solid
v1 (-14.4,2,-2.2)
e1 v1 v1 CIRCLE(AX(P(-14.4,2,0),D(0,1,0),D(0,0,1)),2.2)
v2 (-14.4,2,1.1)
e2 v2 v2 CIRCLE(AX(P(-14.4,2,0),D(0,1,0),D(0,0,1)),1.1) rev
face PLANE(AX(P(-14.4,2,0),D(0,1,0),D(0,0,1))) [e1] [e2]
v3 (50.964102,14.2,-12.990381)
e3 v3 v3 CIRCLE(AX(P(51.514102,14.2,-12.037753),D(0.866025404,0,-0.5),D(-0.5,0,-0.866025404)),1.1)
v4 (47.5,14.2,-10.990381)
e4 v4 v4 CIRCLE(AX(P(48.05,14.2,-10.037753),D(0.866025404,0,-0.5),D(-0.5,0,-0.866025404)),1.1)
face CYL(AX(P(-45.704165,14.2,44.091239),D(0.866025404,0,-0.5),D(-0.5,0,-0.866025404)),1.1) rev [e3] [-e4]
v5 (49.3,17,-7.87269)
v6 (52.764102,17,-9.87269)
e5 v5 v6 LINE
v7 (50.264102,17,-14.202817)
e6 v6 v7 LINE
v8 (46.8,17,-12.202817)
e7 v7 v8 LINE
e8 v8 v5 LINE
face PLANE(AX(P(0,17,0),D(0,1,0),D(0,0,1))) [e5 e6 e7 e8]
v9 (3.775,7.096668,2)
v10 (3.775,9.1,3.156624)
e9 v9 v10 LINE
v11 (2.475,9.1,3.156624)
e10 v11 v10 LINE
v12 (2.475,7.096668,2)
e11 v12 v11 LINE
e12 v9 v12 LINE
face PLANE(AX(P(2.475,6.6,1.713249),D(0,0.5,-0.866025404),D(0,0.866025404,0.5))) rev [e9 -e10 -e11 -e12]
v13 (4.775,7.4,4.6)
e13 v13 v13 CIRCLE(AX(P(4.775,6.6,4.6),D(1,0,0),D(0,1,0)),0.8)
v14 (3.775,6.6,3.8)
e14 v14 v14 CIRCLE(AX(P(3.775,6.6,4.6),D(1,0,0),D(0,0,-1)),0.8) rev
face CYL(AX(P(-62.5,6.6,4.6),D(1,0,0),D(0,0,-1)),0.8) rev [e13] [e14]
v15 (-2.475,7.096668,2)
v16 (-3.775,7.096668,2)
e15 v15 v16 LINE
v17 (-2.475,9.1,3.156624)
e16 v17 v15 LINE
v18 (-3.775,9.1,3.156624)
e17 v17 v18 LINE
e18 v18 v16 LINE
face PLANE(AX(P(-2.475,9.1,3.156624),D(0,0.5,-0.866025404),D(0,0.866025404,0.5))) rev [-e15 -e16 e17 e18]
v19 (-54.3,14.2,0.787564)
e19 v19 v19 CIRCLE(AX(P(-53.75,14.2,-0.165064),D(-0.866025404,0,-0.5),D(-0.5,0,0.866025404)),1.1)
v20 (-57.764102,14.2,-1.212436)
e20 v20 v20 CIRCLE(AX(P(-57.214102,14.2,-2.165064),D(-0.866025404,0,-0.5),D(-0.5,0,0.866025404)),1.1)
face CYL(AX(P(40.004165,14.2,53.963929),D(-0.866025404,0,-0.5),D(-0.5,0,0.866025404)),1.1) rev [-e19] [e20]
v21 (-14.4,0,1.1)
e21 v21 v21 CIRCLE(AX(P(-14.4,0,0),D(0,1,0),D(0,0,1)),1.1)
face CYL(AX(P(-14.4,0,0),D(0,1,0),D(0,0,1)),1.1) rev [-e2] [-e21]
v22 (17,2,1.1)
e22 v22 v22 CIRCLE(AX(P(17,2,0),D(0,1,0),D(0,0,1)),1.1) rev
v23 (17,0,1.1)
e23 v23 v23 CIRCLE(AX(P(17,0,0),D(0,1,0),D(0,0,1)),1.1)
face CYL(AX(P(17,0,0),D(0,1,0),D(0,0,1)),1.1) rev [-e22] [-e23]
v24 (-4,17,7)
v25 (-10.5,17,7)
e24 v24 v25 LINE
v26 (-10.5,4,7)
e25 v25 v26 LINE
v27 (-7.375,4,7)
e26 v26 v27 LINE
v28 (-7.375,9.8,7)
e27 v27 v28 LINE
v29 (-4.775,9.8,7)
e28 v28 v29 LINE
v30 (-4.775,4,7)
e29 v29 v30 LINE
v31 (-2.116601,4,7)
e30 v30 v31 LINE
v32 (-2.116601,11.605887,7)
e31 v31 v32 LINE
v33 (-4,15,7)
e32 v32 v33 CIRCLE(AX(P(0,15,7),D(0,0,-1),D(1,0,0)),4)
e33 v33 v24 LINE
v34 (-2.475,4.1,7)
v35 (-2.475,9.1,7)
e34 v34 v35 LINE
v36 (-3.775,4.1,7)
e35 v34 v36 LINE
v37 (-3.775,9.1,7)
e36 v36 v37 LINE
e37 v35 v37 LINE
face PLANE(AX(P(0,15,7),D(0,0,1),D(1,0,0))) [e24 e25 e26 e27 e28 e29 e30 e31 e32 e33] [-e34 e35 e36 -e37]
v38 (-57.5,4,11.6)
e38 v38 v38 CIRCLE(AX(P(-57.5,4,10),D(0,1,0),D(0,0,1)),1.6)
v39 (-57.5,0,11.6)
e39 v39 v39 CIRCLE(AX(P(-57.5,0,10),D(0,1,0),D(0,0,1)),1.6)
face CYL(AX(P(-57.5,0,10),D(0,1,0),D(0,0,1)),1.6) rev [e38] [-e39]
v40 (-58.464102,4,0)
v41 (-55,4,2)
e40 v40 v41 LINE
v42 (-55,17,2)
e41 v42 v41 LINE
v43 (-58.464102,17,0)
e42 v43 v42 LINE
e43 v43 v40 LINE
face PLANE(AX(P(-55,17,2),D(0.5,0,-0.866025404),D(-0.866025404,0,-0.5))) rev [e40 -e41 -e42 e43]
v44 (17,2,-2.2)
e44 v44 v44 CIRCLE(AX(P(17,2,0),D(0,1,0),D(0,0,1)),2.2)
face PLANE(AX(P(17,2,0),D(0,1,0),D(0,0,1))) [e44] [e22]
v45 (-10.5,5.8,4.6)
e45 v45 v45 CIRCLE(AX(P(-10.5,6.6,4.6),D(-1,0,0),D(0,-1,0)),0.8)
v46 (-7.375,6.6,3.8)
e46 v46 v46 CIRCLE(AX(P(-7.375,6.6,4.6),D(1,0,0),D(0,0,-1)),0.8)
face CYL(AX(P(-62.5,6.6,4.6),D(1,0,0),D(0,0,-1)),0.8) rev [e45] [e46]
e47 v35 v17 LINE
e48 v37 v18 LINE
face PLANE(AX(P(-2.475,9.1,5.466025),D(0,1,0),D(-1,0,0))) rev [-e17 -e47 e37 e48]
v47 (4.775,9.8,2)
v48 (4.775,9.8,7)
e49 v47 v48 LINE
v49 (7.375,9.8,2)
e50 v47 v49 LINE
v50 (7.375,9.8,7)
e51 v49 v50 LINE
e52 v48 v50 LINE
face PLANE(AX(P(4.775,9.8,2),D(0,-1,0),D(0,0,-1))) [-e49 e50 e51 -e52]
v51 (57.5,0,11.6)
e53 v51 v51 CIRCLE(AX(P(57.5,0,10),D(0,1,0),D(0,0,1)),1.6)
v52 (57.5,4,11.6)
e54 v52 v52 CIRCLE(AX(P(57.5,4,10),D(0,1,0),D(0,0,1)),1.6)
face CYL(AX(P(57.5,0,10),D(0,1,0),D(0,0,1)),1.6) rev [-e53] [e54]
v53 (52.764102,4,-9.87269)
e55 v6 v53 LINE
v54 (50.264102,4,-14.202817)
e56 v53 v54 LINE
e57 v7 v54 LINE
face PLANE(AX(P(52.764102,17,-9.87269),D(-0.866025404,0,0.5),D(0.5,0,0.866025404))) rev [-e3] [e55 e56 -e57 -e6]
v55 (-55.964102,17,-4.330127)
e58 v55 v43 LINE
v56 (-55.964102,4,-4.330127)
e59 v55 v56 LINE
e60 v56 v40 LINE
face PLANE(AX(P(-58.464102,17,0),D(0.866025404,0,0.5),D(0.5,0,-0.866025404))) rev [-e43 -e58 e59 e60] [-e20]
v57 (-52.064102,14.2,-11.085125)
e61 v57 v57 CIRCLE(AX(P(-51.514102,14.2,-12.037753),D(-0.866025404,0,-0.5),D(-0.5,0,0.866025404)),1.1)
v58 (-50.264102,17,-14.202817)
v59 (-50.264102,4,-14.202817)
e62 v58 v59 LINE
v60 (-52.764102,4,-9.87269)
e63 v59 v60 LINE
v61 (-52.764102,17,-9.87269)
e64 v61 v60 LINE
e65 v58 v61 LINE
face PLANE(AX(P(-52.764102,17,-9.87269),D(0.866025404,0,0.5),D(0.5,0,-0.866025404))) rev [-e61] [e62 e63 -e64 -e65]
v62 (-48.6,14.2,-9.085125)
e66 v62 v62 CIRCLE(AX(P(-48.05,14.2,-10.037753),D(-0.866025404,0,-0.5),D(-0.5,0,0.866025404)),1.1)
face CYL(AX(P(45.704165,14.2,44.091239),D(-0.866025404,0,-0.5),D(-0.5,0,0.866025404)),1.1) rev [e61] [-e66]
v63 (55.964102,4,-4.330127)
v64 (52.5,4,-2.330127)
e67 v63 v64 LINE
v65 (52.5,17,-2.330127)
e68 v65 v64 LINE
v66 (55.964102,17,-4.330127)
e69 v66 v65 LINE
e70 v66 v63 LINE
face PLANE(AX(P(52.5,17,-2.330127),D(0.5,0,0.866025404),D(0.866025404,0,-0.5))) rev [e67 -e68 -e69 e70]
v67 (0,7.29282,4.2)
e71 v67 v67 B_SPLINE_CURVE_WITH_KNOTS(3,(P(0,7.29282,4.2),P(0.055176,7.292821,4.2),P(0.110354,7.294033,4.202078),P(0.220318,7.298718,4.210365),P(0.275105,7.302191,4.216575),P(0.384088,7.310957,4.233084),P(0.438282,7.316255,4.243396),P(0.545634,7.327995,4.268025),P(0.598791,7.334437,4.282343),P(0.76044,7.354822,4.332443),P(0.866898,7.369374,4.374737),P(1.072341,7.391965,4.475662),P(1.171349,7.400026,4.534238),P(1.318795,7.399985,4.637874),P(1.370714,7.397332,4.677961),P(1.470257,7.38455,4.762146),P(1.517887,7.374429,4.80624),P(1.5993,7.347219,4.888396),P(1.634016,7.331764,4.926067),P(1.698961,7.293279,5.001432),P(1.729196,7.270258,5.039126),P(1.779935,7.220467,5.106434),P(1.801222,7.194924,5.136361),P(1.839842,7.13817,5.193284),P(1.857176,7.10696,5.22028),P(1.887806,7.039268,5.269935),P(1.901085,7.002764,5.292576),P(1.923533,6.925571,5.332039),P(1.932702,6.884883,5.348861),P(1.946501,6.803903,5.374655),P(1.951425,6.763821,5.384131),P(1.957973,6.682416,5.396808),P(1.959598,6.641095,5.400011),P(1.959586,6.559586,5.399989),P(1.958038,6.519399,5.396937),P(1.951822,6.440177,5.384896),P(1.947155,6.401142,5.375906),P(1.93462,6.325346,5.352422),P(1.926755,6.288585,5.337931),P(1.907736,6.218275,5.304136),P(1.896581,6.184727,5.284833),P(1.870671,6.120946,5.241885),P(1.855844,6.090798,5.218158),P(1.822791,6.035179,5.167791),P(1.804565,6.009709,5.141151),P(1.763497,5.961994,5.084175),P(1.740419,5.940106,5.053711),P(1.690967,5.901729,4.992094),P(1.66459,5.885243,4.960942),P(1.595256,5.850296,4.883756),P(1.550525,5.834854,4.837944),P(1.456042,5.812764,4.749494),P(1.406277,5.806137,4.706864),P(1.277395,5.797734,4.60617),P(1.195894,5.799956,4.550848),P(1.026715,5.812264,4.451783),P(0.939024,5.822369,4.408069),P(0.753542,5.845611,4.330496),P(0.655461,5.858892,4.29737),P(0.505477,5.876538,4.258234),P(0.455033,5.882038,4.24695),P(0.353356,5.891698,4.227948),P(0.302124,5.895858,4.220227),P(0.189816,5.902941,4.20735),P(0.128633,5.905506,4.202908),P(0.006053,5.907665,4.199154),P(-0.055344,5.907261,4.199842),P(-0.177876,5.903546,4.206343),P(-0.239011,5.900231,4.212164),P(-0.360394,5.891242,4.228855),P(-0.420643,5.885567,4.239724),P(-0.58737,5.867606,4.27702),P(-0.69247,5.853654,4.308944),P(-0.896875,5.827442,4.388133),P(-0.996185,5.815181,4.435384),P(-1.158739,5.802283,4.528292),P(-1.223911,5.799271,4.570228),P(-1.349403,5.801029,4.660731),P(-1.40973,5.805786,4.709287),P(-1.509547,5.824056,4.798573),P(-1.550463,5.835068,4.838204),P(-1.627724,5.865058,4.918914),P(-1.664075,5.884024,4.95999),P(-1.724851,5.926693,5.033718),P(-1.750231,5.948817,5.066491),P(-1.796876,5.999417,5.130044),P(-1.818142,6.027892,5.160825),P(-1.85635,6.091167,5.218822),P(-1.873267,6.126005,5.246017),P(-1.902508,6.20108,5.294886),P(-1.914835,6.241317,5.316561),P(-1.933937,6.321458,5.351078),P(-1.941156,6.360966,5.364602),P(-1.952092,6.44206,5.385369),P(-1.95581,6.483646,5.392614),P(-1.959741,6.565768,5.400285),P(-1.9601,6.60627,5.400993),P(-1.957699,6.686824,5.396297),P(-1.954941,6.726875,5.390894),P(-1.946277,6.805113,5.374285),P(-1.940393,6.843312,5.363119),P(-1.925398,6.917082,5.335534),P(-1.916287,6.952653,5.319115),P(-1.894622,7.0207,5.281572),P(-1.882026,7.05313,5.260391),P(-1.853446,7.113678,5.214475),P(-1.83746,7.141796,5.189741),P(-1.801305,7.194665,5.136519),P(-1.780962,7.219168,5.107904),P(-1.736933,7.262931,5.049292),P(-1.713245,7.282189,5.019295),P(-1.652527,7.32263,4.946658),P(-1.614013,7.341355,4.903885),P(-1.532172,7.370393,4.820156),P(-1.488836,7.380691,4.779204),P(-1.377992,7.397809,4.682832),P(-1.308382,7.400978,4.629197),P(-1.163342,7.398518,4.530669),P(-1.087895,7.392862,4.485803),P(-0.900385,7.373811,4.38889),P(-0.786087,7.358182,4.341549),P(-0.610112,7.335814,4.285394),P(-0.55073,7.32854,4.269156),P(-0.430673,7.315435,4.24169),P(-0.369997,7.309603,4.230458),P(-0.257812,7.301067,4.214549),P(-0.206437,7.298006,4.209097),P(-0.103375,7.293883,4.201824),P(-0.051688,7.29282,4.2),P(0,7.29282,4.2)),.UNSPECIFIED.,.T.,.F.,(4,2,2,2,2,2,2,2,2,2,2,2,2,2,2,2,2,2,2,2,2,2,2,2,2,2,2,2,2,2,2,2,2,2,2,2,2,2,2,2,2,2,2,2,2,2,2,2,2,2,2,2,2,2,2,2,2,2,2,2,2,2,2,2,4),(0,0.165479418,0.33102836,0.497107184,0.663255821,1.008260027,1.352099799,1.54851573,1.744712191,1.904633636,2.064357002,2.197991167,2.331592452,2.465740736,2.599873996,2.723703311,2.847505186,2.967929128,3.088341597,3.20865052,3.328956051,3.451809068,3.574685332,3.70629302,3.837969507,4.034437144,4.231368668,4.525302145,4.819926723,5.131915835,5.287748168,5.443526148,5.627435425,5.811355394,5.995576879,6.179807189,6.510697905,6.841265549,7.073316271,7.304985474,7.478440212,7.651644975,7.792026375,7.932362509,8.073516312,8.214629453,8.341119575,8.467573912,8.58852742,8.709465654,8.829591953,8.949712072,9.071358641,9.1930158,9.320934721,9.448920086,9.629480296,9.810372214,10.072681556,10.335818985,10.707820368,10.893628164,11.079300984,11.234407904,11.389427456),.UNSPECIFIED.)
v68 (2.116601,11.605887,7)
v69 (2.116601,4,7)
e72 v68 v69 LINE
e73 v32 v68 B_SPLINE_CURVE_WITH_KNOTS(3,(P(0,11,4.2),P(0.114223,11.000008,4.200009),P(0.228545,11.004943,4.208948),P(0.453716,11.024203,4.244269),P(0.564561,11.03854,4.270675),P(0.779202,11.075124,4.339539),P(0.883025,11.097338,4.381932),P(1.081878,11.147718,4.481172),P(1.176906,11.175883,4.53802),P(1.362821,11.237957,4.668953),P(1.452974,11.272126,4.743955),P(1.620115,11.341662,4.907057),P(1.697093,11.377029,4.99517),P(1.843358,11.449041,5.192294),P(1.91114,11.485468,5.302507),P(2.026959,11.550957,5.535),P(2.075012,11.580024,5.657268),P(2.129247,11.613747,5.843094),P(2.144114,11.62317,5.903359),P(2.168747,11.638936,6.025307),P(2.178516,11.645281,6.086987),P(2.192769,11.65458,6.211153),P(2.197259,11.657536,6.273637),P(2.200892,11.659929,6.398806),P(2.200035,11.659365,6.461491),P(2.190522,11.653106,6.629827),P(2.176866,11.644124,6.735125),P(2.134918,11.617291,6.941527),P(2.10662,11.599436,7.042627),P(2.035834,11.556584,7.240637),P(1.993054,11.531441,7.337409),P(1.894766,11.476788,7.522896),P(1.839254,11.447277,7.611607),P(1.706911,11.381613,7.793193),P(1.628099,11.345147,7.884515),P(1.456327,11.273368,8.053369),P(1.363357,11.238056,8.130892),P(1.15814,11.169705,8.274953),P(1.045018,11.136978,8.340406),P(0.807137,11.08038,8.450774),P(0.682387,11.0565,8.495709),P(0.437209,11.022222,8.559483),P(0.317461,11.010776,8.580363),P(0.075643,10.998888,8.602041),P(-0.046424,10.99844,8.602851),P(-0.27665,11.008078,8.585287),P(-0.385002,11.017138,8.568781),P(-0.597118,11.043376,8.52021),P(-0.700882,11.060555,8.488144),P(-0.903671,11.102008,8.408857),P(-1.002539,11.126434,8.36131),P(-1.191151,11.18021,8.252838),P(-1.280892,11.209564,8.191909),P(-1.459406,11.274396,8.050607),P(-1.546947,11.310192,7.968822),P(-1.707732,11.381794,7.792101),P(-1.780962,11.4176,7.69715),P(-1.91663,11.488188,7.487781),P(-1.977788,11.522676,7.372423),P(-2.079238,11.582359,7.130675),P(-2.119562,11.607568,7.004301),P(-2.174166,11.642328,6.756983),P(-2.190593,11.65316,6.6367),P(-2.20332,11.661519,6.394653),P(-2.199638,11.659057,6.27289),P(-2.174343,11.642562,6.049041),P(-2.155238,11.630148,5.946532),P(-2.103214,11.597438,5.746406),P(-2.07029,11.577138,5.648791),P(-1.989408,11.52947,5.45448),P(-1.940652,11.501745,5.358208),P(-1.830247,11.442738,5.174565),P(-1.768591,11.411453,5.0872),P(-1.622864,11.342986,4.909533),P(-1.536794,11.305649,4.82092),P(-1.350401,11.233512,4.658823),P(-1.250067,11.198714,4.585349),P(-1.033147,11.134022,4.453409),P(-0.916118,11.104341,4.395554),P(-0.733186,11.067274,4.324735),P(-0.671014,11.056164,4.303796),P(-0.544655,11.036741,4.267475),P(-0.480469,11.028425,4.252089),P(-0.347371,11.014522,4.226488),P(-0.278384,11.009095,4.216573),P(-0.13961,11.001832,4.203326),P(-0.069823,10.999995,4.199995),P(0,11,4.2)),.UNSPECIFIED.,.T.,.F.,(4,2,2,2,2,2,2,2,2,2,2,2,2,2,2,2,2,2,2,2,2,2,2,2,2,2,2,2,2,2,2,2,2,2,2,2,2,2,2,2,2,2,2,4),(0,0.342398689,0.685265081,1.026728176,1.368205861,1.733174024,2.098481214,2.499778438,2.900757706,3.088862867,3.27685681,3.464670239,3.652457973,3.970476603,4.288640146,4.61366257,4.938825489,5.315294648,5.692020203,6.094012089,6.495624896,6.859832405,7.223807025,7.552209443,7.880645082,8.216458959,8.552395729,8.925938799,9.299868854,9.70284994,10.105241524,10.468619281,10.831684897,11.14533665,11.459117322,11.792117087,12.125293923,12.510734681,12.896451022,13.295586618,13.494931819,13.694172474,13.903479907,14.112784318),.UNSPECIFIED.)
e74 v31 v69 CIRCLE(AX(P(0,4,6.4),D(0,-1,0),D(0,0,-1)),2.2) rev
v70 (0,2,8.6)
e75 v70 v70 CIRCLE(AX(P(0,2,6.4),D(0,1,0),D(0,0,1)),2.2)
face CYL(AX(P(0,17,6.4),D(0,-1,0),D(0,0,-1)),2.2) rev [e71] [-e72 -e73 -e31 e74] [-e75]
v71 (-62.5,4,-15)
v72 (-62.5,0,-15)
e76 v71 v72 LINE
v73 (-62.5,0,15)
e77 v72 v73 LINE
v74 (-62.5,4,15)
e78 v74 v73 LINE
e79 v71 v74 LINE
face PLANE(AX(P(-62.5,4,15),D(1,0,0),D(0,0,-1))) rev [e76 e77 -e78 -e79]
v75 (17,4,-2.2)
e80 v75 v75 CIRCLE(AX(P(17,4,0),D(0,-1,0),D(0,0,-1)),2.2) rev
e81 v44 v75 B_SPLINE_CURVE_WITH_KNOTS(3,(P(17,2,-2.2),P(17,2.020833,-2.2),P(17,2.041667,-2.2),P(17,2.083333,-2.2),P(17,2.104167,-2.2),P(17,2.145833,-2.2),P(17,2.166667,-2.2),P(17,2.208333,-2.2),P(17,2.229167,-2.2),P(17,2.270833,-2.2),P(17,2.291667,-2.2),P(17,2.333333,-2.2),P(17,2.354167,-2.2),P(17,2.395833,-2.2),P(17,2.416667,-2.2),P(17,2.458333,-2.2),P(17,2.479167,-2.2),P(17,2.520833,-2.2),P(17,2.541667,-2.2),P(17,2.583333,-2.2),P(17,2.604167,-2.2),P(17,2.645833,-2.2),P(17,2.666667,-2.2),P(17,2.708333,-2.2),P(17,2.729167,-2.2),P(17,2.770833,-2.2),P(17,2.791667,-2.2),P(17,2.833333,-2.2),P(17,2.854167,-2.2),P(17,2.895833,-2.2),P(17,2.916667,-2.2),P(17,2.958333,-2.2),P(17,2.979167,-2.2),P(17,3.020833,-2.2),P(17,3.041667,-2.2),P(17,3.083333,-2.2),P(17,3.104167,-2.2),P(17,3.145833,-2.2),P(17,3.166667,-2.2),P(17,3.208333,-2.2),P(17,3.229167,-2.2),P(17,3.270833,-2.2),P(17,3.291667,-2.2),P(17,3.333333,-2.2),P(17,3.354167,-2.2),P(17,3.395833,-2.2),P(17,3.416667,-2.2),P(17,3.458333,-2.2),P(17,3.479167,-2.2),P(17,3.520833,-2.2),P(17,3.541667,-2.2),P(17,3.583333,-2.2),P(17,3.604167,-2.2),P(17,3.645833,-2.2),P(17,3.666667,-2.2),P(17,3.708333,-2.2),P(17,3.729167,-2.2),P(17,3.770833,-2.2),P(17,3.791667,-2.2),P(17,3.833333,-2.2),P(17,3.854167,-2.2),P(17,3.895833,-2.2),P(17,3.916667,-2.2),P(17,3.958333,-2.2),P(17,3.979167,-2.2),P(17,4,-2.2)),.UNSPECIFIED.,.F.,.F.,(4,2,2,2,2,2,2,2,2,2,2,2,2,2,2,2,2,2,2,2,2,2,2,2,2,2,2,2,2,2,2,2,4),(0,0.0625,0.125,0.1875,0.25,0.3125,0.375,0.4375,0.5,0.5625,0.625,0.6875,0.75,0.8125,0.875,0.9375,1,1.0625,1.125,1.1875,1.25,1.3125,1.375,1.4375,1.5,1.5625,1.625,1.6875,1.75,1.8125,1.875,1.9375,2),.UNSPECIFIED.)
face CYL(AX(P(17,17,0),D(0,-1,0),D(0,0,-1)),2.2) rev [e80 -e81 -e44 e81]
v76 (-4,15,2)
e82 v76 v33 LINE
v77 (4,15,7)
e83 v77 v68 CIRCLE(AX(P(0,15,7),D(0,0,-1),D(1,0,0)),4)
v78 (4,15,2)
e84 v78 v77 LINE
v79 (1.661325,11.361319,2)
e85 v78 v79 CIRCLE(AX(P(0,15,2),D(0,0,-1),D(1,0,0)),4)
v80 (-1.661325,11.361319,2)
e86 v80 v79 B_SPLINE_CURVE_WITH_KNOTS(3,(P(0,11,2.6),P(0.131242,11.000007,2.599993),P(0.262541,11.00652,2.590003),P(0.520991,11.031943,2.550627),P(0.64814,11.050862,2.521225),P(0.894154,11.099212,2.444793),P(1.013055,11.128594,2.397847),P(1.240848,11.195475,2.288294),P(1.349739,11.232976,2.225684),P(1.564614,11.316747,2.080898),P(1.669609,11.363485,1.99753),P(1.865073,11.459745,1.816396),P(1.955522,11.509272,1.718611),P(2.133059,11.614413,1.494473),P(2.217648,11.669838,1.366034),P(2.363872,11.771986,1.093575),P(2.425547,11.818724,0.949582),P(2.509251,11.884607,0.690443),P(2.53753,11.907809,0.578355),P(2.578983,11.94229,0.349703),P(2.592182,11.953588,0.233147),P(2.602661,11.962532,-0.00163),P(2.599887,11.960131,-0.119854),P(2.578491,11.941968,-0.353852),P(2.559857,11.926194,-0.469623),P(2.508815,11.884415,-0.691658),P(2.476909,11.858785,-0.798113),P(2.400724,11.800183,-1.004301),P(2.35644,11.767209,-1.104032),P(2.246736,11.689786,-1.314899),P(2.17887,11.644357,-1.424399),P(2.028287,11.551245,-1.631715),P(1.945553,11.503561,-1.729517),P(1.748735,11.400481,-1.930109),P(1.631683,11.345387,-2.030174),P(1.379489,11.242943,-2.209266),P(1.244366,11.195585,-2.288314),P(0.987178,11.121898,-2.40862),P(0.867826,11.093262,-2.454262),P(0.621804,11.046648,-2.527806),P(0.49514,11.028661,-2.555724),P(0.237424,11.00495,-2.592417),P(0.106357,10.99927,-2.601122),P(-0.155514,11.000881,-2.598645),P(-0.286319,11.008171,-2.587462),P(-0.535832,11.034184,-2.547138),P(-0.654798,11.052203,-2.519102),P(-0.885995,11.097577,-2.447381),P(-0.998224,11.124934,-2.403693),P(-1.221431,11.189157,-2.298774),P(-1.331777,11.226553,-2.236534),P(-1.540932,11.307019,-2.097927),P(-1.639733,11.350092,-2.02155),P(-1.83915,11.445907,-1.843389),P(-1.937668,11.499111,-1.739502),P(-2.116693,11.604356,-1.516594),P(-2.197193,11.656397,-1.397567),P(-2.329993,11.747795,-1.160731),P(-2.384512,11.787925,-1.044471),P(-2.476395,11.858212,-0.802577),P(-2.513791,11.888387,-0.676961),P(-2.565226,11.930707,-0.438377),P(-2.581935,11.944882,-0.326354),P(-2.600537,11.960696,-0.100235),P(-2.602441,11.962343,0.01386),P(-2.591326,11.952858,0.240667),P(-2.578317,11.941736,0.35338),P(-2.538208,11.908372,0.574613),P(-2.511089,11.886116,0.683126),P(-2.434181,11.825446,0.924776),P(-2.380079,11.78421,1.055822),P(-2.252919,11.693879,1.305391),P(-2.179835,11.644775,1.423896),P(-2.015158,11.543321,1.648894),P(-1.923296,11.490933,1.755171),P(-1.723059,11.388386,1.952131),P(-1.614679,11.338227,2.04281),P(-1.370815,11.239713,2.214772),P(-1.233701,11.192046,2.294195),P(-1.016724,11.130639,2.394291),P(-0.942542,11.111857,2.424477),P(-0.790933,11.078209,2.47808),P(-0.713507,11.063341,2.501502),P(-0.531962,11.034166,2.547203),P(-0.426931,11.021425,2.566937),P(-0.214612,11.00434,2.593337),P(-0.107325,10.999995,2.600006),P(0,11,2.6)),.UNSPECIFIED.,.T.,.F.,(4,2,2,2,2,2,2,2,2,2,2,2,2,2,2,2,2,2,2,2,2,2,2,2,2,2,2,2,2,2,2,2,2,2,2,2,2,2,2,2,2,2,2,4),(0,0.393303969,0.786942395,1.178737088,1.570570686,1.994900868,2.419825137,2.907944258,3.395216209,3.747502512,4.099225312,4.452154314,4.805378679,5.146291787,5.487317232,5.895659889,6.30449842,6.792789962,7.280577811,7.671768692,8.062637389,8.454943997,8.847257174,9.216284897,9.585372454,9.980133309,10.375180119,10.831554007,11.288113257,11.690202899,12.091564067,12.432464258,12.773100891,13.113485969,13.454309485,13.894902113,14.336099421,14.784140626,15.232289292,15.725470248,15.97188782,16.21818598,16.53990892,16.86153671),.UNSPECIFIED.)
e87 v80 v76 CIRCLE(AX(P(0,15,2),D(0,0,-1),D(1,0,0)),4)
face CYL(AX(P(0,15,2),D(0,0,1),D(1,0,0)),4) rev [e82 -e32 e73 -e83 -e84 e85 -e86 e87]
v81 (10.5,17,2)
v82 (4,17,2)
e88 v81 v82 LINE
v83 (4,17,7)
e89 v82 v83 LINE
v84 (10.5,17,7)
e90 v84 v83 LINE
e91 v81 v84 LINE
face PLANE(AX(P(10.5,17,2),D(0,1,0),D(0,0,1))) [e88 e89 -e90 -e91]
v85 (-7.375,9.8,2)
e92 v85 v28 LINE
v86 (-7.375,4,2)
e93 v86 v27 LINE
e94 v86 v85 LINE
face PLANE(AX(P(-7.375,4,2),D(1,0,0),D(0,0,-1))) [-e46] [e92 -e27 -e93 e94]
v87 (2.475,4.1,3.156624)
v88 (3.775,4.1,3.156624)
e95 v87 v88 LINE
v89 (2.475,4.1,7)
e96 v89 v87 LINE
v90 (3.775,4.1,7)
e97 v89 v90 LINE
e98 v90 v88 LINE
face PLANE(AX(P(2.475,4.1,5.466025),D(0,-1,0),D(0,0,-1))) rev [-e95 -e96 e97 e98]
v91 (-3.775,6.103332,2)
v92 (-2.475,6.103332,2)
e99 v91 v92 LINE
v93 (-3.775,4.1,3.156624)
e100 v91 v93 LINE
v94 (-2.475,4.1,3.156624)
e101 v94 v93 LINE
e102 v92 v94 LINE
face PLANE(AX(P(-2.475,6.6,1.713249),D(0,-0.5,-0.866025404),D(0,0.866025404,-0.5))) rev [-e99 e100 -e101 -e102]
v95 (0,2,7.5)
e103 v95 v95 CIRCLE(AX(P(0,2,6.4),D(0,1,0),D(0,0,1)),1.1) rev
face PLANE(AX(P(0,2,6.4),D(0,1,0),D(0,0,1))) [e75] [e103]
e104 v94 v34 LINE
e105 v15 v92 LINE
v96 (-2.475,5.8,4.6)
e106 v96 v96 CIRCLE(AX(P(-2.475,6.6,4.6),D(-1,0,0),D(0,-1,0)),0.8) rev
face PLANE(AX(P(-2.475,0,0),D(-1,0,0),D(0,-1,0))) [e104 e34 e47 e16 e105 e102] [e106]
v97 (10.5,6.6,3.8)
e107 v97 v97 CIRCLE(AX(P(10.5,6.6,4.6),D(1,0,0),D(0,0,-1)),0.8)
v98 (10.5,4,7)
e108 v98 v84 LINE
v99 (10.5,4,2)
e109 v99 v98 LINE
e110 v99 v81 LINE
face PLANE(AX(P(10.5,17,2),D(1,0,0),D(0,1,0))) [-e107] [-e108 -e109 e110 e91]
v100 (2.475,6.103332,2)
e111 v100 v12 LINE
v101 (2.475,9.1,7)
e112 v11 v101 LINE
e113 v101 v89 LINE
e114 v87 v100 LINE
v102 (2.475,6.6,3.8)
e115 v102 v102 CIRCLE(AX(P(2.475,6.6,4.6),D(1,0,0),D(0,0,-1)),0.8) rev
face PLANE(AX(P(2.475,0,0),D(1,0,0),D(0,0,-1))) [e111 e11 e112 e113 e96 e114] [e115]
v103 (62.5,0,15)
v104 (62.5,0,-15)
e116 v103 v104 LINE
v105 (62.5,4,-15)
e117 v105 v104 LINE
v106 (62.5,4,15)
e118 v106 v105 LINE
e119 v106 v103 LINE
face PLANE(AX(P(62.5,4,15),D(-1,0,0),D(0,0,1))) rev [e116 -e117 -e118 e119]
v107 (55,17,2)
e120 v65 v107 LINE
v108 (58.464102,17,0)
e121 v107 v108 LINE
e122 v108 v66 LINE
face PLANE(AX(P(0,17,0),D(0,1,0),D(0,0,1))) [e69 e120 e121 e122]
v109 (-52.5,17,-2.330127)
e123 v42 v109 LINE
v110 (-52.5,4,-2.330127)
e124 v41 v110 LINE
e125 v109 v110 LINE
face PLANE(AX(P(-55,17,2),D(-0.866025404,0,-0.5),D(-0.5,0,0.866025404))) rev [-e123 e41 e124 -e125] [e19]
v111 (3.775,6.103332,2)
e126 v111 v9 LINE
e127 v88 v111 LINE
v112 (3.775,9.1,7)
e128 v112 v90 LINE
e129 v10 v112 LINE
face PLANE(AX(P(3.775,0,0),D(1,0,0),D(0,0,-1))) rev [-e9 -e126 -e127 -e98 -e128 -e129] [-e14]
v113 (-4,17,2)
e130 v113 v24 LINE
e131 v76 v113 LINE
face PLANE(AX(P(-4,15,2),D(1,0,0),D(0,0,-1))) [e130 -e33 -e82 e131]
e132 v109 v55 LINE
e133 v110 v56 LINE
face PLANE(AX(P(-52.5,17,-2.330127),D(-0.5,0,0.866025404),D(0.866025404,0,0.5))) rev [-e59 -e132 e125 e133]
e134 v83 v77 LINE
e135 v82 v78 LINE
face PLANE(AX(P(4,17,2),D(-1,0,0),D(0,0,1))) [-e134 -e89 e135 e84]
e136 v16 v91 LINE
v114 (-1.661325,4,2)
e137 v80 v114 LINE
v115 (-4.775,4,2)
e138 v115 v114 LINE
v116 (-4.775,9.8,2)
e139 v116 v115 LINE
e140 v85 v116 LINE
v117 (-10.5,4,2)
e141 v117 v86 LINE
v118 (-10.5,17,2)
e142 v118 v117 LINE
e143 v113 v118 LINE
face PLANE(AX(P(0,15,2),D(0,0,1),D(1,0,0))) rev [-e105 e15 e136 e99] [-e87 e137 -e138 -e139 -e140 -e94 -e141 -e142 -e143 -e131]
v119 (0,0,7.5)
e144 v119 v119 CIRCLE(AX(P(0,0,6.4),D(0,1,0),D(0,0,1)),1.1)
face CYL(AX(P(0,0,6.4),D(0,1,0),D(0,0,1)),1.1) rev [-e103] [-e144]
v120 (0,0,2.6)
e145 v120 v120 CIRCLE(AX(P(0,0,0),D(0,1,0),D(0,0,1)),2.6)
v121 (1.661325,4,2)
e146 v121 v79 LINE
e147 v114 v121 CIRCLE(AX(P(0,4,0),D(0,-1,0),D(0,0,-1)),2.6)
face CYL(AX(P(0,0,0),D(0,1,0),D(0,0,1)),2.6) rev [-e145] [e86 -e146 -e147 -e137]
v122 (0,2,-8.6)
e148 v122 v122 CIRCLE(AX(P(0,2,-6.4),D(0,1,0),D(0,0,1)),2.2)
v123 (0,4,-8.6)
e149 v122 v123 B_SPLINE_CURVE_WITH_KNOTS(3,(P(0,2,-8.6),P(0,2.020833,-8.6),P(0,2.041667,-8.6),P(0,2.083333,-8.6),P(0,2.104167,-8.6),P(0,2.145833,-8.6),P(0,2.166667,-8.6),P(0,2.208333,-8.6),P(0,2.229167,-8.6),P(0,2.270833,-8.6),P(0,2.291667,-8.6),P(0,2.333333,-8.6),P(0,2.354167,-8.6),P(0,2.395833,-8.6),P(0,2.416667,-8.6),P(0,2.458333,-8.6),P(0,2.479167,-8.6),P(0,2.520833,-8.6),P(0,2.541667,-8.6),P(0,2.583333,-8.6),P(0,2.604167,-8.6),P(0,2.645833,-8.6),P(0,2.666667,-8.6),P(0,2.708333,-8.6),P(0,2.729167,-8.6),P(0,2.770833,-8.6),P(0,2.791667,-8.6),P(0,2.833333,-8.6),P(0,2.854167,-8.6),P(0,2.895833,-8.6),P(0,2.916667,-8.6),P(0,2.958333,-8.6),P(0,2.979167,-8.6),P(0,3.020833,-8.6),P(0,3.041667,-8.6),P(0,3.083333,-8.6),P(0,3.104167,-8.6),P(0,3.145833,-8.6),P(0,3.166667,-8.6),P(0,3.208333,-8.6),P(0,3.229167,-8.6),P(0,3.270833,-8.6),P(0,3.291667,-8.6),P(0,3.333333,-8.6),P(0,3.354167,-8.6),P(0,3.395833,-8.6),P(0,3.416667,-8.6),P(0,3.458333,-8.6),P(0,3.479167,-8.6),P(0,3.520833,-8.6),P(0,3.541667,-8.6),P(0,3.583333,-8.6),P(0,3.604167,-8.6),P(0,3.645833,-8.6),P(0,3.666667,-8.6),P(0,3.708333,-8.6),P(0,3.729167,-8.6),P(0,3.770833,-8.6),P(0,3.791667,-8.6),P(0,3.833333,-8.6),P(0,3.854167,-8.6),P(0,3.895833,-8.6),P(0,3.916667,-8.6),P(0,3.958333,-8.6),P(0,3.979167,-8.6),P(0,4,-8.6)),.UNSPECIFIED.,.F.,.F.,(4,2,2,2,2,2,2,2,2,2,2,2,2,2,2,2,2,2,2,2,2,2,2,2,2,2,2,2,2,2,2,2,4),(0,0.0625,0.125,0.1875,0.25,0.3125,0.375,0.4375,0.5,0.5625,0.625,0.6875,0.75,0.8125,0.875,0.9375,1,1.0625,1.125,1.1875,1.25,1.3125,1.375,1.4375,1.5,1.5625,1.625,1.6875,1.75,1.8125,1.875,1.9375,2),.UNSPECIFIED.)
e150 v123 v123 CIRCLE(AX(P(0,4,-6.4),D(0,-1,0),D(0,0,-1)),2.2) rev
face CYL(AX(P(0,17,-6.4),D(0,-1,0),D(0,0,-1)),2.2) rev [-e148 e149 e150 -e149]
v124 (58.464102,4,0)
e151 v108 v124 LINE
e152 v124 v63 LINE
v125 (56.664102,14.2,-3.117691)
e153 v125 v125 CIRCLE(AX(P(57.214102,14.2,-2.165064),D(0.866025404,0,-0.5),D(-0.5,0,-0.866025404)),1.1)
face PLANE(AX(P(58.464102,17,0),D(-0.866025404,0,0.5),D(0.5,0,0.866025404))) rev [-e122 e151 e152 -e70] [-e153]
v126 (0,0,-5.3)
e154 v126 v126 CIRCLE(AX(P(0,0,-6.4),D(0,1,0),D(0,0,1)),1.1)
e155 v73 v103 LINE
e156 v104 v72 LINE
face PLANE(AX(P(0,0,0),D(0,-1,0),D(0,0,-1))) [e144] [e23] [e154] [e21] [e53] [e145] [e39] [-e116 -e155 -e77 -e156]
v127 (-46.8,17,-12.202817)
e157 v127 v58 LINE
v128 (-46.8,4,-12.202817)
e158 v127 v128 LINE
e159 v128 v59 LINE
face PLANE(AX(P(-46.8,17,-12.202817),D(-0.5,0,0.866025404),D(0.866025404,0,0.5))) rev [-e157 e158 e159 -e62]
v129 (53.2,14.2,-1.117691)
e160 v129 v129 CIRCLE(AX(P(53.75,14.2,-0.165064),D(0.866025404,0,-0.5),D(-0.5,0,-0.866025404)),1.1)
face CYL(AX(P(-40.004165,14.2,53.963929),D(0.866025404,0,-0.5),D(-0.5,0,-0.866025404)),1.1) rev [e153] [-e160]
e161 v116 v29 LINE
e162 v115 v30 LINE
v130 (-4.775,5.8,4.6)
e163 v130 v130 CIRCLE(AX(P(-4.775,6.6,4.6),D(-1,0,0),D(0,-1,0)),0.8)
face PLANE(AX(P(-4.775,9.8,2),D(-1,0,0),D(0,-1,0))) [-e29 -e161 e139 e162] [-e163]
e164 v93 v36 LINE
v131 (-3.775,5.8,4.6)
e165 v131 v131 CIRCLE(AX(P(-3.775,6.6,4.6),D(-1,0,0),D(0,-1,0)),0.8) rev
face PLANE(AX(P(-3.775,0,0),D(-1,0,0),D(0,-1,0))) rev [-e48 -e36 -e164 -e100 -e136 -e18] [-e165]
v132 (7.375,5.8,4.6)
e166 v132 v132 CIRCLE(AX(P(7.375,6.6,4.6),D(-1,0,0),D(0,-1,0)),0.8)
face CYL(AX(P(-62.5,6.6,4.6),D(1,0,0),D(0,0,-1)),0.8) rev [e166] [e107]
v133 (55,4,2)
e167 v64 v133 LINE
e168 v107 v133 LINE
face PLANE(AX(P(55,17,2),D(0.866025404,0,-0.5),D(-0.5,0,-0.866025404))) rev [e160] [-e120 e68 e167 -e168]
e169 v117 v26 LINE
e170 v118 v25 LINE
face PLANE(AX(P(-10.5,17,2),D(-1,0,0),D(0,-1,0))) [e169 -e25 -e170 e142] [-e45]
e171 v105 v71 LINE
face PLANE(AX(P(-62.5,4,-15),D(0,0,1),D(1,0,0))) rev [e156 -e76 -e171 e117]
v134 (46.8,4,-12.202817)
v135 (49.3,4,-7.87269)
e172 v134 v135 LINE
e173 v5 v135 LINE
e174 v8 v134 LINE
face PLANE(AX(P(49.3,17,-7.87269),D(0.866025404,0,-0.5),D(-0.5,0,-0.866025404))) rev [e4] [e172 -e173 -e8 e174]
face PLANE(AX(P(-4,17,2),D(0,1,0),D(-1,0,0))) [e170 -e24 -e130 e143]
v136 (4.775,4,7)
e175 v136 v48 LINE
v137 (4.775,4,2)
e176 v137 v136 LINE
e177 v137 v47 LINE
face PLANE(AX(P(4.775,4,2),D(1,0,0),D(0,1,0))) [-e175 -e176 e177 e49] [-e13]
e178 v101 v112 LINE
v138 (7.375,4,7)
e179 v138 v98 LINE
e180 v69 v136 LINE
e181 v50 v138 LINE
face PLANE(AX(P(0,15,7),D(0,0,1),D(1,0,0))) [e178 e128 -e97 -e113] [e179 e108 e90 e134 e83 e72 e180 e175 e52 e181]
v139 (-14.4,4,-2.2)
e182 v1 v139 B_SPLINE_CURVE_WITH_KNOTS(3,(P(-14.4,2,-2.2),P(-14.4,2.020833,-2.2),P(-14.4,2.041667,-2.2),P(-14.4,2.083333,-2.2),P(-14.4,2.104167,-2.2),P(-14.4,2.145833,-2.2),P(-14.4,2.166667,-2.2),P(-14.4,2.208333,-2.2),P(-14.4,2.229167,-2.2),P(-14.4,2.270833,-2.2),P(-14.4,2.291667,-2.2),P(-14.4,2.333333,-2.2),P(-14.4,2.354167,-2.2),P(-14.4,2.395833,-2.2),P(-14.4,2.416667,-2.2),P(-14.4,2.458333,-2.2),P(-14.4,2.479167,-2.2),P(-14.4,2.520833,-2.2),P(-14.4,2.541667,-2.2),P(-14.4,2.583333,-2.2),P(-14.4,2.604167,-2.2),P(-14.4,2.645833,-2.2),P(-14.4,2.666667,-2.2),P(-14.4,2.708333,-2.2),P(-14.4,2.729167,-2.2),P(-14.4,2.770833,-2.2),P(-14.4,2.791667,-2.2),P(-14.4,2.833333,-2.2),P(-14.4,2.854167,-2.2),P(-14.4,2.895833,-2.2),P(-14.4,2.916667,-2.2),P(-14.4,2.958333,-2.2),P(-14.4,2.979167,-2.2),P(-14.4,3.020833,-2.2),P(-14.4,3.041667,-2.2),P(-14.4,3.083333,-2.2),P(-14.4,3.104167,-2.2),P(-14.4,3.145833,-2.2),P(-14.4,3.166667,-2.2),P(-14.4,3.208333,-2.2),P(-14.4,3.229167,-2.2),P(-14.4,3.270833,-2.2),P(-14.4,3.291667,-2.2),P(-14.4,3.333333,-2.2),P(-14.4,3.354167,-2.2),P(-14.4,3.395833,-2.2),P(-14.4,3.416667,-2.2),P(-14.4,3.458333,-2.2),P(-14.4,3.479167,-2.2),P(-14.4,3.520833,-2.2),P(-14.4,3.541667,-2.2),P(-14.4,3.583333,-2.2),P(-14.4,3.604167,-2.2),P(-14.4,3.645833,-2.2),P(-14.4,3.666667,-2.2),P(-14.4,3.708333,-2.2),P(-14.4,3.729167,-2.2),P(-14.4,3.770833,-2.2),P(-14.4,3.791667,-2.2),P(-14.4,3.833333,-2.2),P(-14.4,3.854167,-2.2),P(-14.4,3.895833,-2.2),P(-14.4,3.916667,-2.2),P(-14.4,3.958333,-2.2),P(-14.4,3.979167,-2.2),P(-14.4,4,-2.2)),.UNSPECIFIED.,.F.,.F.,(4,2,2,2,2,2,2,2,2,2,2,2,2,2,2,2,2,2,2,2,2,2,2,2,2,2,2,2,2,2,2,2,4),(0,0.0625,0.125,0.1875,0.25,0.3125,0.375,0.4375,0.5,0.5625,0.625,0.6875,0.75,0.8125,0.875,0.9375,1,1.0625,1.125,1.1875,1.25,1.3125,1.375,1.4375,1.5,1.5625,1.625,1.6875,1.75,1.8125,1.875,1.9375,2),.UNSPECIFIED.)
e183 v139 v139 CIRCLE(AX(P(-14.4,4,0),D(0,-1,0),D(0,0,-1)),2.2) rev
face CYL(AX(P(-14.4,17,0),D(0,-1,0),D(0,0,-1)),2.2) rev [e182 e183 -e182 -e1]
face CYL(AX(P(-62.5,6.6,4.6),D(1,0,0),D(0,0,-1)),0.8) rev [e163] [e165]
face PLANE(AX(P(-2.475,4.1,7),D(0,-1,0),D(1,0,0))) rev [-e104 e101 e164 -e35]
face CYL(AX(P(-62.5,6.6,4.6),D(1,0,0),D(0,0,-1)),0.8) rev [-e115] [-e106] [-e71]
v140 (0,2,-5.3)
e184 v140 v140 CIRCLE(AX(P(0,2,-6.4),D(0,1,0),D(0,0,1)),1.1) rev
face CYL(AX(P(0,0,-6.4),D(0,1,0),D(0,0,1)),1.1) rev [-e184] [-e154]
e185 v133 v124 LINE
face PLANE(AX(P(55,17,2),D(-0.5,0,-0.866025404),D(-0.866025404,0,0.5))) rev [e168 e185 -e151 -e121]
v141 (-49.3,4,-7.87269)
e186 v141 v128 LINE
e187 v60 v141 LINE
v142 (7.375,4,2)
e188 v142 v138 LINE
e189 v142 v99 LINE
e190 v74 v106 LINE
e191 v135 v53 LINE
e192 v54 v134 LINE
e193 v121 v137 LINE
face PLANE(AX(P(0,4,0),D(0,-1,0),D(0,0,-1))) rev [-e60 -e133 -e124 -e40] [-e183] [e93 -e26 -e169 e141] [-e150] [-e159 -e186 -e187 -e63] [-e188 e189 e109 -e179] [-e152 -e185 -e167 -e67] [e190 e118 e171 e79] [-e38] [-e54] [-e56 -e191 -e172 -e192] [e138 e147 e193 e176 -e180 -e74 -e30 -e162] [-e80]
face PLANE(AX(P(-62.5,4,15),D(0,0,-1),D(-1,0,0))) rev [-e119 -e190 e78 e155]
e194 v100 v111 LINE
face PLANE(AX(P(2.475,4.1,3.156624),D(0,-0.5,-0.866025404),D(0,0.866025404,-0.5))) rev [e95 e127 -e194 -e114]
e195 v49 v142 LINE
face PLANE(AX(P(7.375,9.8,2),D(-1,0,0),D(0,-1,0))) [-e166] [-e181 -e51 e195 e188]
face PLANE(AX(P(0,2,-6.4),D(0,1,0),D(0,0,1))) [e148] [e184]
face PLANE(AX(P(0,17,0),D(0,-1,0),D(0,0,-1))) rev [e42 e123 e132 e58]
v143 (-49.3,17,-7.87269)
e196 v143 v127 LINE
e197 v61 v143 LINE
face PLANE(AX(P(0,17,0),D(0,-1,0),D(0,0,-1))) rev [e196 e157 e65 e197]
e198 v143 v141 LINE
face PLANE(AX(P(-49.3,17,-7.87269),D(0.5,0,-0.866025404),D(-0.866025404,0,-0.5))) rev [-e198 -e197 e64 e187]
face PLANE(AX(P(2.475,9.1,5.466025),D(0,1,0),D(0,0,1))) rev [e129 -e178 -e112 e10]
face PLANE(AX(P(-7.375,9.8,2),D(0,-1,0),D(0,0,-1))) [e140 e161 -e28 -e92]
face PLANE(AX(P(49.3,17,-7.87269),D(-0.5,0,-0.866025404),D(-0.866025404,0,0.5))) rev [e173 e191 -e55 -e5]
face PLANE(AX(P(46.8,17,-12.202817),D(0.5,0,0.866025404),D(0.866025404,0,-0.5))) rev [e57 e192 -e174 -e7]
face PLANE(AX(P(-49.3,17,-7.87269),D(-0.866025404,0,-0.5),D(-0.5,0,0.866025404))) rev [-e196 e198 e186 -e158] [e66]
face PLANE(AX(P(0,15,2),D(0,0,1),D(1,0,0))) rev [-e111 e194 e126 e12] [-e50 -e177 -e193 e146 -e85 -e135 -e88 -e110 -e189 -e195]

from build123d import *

# Parameters (mm, degrees)
SKETCH_1_W                = 125
SKETCH_1_H                = 30
EXTRUDE_1_DEPTH           = 4
EXTRUDE_3_DEPTH           = 5
SKETCH_11_R               = 0.8
CUT_EXTRUDE_6_DEPTH       = 77.439518575
CUT_EXTRUDE_7_DEPTH       = 1.3
CUT_EXTRUDE_8_DEPTH       = 1.3
EXTRUDE_4_DEPTH           = 13
SKETCH_15_R               = 1.1
CUT_EXTRUDE_9_DEPTH       = 115.99682112
SKETCH_16_R               = 1.1
CUT_EXTRUDE_10_DEPTH      = 115.99682112
CUT_EXTRUDE_11_DEPTH      = 66.576291447
CUT_EXTRUDE_11_DEPTH_BACK = 66.576291447
SKETCH_17_R               = 1.1
SKETCH_17_R_2             = 2.6
CUT_EXTRUDE_12_DEPTH      = 66.576291447
CUT_EXTRUDE_12_DEPTH_BACK = 2
SKETCH_18_R               = 2.2
SKETCH_19_R               = 1.6
CUT_EXTRUDE_13_DEPTH      = 66.576291447


with BuildPart() as part:
    # Эскиз1 → Бобышка-Вытянуть1 (new body)
    with BuildSketch(Plane(origin=(0, 0, 0), x_dir=(1, 0, 0), z_dir=(0, 1, 0))):
        Rectangle(SKETCH_1_W, SKETCH_1_H)
    extrude(amount=EXTRUDE_1_DEPTH)

    # Эскиз4 → Бобышка-Вытянуть3 (add)
    with BuildSketch(Plane.XY.offset(7)):
        with BuildLine():
            Line((-4, 15), (-4, 17))
            Line((-4, 17), (-10.5, 17))
            Line((-10.5, 17), (-10.5, 4))
            Line((-10.5, 4), (-7.375, 4))
            Line((-7.375, 4), (-7.375, 9.8))
            Line((-7.375, 9.8), (-4.775, 9.8))
            Line((-4.775, 9.8), (-4.775, 4))
            Line((-4.775, 4), (4.775, 4))
            Line((4.775, 4), (4.775, 9.8))
            Line((4.775, 9.8), (7.375, 9.8))
            Line((7.375, 9.8), (7.375, 4))
            Line((7.375, 4), (10.5, 4))
            Line((10.5, 4), (10.5, 17))
            Line((10.5, 17), (4, 17))
            Line((4, 17), (4, 15))
            ThreePointArc((4, 15), (0, 11), (-4, 15))
        make_face()
    extrude(amount=-EXTRUDE_3_DEPTH)

    # Эскиз11 → Вырез-Вытянуть6 (cut, through all)
    with BuildSketch(Plane(origin=(10.5, 0, 0), x_dir=(0, 0, -1), z_dir=(1, 0, 0))):
        with Locations((-4.6, 6.6)):
            Circle(SKETCH_11_R)
    extrude(amount=-CUT_EXTRUDE_6_DEPTH, mode=Mode.SUBTRACT)

    # Эскиз12 → Вырез-Вытянуть7 (cut)
    with BuildSketch(Plane.ZY.offset(3.775)):
        Polygon((5.466025404, 9.1), (7, 9.1), (7, 4.1), (5.466025404, 4.1), (3.156624327, 4.1), (1.713248654, 6.6), (3.156624327, 9.1), align=None)
    extrude(amount=-CUT_EXTRUDE_7_DEPTH, mode=Mode.SUBTRACT)

    # Эскиз13 → Вырез-Вытянуть8 (cut)
    with BuildSketch(Plane(origin=(3.775, 0, 0), x_dir=(0, 0, -1), z_dir=(1, 0, 0))):
        Polygon((-5.466025404, 9.1), (-7, 9.1), (-7, 4.1), (-5.466025404, 4.1), (-3.156624327, 4.1), (-1.713248654, 6.6), (-3.156624327, 9.1), align=None)
    extrude(amount=-CUT_EXTRUDE_8_DEPTH, mode=Mode.SUBTRACT)

    # Эскиз14 → Бобышка-Вытянуть4 (add)
    with BuildSketch(Plane(origin=(0, 4, 0), x_dir=(1, 0, 0), z_dir=(0, 1, 0))):
        Polygon((55, -2), (52.5, 2.330127019), (55.964101615, 4.330127019), (58.464101615, 0), align=None)
        Polygon((49.3, 7.872689603), (46.8, 12.202816622), (50.264101615, 14.202816622), (52.764101615, 9.872689603), align=None)
        Polygon((-55, -2), (-52.5, 2.330127019), (-55.964101615, 4.330127019), (-58.464101615, 0), align=None)
        Polygon((-49.3, 7.872689603), (-46.8, 12.202816622), (-50.264101615, 14.202816622), (-52.764101615, 9.872689603), align=None)
    extrude(amount=EXTRUDE_4_DEPTH)

    # Эскиз15 → Вырез-Вытянуть9 (cut, through all)
    with BuildSketch(Plane(origin=(-43.848076211, 0, -25.315698604), x_dir=(-0.5000000000000007, 0, 0.8660254037844383), z_dir=(-0.8660254037844383, 0, -0.5000000000000007))):
        with Locations((15.332050808, 14.2)):
            Circle(SKETCH_15_R)
        with Locations((26.732050808, 14.2)):
            Circle(SKETCH_15_R)
    extrude(amount=-CUT_EXTRUDE_9_DEPTH, mode=Mode.SUBTRACT)

    # Эскиз16 → Вырез-Вытянуть10 (cut, through all)
    with BuildSketch(Plane(origin=(43.848076211, 0, -25.315698604), x_dir=(-0.5000000000000019, 0, -0.8660254037844377), z_dir=(0.8660254037844377, 0, -0.5000000000000019))):
        with Locations((-26.732050808, 14.2)):
            Circle(SKETCH_16_R)
        with Locations((-15.332050808, 14.2)):
            Circle(SKETCH_16_R)
    extrude(amount=-CUT_EXTRUDE_10_DEPTH, mode=Mode.SUBTRACT)

    # Эскиз17 → Вырез-Вытянуть11 (cut, two sides: drawn at the far end of the back side and taken through both)
    with BuildSketch(Plane(origin=(0, 4, 0), x_dir=(1, 0, 0), z_dir=(0, 1, 0)).offset(-CUT_EXTRUDE_11_DEPTH_BACK)):
        with Locations((-14.4, 0)):
            Circle(SKETCH_17_R)
        with Locations((17, 0)):
            Circle(SKETCH_17_R)
        with Locations((0, 6.4)):
            Circle(SKETCH_17_R)
        with Locations((0, -6.4)):
            Circle(SKETCH_17_R)
        Circle(SKETCH_17_R_2)
    extrude(amount=CUT_EXTRUDE_11_DEPTH + CUT_EXTRUDE_11_DEPTH_BACK, mode=Mode.SUBTRACT)

    # Эскиз18 → Вырез-Вытянуть12 (cut, two sides: drawn at the far end of the back side and taken through both)
    with BuildSketch(Plane(origin=(0, 4, 0), x_dir=(1, 0, 0), z_dir=(0, 1, 0)).offset(-CUT_EXTRUDE_12_DEPTH_BACK)):
        with Locations((-14.4, 0)):
            Circle(SKETCH_18_R)
        with Locations((17, 0)):
            Circle(SKETCH_18_R)
        with Locations((0, -6.4)):
            Circle(SKETCH_18_R)
        with Locations((0, 6.4)):
            Circle(SKETCH_18_R)
    extrude(amount=CUT_EXTRUDE_12_DEPTH + CUT_EXTRUDE_12_DEPTH_BACK, mode=Mode.SUBTRACT)

    # Эскиз19 → Вырез-Вытянуть13 (cut, through all)
    with BuildSketch(Plane(origin=(0, 4, 0), x_dir=(1, 0, 0), z_dir=(0, 1, 0))):
        with Locations((-57.5, -10)):
            Circle(SKETCH_19_R)
        with Locations((57.5, -10)):
            Circle(SKETCH_19_R)
    extrude(amount=-CUT_EXTRUDE_13_DEPTH, mode=Mode.SUBTRACT)


solid = part.part
